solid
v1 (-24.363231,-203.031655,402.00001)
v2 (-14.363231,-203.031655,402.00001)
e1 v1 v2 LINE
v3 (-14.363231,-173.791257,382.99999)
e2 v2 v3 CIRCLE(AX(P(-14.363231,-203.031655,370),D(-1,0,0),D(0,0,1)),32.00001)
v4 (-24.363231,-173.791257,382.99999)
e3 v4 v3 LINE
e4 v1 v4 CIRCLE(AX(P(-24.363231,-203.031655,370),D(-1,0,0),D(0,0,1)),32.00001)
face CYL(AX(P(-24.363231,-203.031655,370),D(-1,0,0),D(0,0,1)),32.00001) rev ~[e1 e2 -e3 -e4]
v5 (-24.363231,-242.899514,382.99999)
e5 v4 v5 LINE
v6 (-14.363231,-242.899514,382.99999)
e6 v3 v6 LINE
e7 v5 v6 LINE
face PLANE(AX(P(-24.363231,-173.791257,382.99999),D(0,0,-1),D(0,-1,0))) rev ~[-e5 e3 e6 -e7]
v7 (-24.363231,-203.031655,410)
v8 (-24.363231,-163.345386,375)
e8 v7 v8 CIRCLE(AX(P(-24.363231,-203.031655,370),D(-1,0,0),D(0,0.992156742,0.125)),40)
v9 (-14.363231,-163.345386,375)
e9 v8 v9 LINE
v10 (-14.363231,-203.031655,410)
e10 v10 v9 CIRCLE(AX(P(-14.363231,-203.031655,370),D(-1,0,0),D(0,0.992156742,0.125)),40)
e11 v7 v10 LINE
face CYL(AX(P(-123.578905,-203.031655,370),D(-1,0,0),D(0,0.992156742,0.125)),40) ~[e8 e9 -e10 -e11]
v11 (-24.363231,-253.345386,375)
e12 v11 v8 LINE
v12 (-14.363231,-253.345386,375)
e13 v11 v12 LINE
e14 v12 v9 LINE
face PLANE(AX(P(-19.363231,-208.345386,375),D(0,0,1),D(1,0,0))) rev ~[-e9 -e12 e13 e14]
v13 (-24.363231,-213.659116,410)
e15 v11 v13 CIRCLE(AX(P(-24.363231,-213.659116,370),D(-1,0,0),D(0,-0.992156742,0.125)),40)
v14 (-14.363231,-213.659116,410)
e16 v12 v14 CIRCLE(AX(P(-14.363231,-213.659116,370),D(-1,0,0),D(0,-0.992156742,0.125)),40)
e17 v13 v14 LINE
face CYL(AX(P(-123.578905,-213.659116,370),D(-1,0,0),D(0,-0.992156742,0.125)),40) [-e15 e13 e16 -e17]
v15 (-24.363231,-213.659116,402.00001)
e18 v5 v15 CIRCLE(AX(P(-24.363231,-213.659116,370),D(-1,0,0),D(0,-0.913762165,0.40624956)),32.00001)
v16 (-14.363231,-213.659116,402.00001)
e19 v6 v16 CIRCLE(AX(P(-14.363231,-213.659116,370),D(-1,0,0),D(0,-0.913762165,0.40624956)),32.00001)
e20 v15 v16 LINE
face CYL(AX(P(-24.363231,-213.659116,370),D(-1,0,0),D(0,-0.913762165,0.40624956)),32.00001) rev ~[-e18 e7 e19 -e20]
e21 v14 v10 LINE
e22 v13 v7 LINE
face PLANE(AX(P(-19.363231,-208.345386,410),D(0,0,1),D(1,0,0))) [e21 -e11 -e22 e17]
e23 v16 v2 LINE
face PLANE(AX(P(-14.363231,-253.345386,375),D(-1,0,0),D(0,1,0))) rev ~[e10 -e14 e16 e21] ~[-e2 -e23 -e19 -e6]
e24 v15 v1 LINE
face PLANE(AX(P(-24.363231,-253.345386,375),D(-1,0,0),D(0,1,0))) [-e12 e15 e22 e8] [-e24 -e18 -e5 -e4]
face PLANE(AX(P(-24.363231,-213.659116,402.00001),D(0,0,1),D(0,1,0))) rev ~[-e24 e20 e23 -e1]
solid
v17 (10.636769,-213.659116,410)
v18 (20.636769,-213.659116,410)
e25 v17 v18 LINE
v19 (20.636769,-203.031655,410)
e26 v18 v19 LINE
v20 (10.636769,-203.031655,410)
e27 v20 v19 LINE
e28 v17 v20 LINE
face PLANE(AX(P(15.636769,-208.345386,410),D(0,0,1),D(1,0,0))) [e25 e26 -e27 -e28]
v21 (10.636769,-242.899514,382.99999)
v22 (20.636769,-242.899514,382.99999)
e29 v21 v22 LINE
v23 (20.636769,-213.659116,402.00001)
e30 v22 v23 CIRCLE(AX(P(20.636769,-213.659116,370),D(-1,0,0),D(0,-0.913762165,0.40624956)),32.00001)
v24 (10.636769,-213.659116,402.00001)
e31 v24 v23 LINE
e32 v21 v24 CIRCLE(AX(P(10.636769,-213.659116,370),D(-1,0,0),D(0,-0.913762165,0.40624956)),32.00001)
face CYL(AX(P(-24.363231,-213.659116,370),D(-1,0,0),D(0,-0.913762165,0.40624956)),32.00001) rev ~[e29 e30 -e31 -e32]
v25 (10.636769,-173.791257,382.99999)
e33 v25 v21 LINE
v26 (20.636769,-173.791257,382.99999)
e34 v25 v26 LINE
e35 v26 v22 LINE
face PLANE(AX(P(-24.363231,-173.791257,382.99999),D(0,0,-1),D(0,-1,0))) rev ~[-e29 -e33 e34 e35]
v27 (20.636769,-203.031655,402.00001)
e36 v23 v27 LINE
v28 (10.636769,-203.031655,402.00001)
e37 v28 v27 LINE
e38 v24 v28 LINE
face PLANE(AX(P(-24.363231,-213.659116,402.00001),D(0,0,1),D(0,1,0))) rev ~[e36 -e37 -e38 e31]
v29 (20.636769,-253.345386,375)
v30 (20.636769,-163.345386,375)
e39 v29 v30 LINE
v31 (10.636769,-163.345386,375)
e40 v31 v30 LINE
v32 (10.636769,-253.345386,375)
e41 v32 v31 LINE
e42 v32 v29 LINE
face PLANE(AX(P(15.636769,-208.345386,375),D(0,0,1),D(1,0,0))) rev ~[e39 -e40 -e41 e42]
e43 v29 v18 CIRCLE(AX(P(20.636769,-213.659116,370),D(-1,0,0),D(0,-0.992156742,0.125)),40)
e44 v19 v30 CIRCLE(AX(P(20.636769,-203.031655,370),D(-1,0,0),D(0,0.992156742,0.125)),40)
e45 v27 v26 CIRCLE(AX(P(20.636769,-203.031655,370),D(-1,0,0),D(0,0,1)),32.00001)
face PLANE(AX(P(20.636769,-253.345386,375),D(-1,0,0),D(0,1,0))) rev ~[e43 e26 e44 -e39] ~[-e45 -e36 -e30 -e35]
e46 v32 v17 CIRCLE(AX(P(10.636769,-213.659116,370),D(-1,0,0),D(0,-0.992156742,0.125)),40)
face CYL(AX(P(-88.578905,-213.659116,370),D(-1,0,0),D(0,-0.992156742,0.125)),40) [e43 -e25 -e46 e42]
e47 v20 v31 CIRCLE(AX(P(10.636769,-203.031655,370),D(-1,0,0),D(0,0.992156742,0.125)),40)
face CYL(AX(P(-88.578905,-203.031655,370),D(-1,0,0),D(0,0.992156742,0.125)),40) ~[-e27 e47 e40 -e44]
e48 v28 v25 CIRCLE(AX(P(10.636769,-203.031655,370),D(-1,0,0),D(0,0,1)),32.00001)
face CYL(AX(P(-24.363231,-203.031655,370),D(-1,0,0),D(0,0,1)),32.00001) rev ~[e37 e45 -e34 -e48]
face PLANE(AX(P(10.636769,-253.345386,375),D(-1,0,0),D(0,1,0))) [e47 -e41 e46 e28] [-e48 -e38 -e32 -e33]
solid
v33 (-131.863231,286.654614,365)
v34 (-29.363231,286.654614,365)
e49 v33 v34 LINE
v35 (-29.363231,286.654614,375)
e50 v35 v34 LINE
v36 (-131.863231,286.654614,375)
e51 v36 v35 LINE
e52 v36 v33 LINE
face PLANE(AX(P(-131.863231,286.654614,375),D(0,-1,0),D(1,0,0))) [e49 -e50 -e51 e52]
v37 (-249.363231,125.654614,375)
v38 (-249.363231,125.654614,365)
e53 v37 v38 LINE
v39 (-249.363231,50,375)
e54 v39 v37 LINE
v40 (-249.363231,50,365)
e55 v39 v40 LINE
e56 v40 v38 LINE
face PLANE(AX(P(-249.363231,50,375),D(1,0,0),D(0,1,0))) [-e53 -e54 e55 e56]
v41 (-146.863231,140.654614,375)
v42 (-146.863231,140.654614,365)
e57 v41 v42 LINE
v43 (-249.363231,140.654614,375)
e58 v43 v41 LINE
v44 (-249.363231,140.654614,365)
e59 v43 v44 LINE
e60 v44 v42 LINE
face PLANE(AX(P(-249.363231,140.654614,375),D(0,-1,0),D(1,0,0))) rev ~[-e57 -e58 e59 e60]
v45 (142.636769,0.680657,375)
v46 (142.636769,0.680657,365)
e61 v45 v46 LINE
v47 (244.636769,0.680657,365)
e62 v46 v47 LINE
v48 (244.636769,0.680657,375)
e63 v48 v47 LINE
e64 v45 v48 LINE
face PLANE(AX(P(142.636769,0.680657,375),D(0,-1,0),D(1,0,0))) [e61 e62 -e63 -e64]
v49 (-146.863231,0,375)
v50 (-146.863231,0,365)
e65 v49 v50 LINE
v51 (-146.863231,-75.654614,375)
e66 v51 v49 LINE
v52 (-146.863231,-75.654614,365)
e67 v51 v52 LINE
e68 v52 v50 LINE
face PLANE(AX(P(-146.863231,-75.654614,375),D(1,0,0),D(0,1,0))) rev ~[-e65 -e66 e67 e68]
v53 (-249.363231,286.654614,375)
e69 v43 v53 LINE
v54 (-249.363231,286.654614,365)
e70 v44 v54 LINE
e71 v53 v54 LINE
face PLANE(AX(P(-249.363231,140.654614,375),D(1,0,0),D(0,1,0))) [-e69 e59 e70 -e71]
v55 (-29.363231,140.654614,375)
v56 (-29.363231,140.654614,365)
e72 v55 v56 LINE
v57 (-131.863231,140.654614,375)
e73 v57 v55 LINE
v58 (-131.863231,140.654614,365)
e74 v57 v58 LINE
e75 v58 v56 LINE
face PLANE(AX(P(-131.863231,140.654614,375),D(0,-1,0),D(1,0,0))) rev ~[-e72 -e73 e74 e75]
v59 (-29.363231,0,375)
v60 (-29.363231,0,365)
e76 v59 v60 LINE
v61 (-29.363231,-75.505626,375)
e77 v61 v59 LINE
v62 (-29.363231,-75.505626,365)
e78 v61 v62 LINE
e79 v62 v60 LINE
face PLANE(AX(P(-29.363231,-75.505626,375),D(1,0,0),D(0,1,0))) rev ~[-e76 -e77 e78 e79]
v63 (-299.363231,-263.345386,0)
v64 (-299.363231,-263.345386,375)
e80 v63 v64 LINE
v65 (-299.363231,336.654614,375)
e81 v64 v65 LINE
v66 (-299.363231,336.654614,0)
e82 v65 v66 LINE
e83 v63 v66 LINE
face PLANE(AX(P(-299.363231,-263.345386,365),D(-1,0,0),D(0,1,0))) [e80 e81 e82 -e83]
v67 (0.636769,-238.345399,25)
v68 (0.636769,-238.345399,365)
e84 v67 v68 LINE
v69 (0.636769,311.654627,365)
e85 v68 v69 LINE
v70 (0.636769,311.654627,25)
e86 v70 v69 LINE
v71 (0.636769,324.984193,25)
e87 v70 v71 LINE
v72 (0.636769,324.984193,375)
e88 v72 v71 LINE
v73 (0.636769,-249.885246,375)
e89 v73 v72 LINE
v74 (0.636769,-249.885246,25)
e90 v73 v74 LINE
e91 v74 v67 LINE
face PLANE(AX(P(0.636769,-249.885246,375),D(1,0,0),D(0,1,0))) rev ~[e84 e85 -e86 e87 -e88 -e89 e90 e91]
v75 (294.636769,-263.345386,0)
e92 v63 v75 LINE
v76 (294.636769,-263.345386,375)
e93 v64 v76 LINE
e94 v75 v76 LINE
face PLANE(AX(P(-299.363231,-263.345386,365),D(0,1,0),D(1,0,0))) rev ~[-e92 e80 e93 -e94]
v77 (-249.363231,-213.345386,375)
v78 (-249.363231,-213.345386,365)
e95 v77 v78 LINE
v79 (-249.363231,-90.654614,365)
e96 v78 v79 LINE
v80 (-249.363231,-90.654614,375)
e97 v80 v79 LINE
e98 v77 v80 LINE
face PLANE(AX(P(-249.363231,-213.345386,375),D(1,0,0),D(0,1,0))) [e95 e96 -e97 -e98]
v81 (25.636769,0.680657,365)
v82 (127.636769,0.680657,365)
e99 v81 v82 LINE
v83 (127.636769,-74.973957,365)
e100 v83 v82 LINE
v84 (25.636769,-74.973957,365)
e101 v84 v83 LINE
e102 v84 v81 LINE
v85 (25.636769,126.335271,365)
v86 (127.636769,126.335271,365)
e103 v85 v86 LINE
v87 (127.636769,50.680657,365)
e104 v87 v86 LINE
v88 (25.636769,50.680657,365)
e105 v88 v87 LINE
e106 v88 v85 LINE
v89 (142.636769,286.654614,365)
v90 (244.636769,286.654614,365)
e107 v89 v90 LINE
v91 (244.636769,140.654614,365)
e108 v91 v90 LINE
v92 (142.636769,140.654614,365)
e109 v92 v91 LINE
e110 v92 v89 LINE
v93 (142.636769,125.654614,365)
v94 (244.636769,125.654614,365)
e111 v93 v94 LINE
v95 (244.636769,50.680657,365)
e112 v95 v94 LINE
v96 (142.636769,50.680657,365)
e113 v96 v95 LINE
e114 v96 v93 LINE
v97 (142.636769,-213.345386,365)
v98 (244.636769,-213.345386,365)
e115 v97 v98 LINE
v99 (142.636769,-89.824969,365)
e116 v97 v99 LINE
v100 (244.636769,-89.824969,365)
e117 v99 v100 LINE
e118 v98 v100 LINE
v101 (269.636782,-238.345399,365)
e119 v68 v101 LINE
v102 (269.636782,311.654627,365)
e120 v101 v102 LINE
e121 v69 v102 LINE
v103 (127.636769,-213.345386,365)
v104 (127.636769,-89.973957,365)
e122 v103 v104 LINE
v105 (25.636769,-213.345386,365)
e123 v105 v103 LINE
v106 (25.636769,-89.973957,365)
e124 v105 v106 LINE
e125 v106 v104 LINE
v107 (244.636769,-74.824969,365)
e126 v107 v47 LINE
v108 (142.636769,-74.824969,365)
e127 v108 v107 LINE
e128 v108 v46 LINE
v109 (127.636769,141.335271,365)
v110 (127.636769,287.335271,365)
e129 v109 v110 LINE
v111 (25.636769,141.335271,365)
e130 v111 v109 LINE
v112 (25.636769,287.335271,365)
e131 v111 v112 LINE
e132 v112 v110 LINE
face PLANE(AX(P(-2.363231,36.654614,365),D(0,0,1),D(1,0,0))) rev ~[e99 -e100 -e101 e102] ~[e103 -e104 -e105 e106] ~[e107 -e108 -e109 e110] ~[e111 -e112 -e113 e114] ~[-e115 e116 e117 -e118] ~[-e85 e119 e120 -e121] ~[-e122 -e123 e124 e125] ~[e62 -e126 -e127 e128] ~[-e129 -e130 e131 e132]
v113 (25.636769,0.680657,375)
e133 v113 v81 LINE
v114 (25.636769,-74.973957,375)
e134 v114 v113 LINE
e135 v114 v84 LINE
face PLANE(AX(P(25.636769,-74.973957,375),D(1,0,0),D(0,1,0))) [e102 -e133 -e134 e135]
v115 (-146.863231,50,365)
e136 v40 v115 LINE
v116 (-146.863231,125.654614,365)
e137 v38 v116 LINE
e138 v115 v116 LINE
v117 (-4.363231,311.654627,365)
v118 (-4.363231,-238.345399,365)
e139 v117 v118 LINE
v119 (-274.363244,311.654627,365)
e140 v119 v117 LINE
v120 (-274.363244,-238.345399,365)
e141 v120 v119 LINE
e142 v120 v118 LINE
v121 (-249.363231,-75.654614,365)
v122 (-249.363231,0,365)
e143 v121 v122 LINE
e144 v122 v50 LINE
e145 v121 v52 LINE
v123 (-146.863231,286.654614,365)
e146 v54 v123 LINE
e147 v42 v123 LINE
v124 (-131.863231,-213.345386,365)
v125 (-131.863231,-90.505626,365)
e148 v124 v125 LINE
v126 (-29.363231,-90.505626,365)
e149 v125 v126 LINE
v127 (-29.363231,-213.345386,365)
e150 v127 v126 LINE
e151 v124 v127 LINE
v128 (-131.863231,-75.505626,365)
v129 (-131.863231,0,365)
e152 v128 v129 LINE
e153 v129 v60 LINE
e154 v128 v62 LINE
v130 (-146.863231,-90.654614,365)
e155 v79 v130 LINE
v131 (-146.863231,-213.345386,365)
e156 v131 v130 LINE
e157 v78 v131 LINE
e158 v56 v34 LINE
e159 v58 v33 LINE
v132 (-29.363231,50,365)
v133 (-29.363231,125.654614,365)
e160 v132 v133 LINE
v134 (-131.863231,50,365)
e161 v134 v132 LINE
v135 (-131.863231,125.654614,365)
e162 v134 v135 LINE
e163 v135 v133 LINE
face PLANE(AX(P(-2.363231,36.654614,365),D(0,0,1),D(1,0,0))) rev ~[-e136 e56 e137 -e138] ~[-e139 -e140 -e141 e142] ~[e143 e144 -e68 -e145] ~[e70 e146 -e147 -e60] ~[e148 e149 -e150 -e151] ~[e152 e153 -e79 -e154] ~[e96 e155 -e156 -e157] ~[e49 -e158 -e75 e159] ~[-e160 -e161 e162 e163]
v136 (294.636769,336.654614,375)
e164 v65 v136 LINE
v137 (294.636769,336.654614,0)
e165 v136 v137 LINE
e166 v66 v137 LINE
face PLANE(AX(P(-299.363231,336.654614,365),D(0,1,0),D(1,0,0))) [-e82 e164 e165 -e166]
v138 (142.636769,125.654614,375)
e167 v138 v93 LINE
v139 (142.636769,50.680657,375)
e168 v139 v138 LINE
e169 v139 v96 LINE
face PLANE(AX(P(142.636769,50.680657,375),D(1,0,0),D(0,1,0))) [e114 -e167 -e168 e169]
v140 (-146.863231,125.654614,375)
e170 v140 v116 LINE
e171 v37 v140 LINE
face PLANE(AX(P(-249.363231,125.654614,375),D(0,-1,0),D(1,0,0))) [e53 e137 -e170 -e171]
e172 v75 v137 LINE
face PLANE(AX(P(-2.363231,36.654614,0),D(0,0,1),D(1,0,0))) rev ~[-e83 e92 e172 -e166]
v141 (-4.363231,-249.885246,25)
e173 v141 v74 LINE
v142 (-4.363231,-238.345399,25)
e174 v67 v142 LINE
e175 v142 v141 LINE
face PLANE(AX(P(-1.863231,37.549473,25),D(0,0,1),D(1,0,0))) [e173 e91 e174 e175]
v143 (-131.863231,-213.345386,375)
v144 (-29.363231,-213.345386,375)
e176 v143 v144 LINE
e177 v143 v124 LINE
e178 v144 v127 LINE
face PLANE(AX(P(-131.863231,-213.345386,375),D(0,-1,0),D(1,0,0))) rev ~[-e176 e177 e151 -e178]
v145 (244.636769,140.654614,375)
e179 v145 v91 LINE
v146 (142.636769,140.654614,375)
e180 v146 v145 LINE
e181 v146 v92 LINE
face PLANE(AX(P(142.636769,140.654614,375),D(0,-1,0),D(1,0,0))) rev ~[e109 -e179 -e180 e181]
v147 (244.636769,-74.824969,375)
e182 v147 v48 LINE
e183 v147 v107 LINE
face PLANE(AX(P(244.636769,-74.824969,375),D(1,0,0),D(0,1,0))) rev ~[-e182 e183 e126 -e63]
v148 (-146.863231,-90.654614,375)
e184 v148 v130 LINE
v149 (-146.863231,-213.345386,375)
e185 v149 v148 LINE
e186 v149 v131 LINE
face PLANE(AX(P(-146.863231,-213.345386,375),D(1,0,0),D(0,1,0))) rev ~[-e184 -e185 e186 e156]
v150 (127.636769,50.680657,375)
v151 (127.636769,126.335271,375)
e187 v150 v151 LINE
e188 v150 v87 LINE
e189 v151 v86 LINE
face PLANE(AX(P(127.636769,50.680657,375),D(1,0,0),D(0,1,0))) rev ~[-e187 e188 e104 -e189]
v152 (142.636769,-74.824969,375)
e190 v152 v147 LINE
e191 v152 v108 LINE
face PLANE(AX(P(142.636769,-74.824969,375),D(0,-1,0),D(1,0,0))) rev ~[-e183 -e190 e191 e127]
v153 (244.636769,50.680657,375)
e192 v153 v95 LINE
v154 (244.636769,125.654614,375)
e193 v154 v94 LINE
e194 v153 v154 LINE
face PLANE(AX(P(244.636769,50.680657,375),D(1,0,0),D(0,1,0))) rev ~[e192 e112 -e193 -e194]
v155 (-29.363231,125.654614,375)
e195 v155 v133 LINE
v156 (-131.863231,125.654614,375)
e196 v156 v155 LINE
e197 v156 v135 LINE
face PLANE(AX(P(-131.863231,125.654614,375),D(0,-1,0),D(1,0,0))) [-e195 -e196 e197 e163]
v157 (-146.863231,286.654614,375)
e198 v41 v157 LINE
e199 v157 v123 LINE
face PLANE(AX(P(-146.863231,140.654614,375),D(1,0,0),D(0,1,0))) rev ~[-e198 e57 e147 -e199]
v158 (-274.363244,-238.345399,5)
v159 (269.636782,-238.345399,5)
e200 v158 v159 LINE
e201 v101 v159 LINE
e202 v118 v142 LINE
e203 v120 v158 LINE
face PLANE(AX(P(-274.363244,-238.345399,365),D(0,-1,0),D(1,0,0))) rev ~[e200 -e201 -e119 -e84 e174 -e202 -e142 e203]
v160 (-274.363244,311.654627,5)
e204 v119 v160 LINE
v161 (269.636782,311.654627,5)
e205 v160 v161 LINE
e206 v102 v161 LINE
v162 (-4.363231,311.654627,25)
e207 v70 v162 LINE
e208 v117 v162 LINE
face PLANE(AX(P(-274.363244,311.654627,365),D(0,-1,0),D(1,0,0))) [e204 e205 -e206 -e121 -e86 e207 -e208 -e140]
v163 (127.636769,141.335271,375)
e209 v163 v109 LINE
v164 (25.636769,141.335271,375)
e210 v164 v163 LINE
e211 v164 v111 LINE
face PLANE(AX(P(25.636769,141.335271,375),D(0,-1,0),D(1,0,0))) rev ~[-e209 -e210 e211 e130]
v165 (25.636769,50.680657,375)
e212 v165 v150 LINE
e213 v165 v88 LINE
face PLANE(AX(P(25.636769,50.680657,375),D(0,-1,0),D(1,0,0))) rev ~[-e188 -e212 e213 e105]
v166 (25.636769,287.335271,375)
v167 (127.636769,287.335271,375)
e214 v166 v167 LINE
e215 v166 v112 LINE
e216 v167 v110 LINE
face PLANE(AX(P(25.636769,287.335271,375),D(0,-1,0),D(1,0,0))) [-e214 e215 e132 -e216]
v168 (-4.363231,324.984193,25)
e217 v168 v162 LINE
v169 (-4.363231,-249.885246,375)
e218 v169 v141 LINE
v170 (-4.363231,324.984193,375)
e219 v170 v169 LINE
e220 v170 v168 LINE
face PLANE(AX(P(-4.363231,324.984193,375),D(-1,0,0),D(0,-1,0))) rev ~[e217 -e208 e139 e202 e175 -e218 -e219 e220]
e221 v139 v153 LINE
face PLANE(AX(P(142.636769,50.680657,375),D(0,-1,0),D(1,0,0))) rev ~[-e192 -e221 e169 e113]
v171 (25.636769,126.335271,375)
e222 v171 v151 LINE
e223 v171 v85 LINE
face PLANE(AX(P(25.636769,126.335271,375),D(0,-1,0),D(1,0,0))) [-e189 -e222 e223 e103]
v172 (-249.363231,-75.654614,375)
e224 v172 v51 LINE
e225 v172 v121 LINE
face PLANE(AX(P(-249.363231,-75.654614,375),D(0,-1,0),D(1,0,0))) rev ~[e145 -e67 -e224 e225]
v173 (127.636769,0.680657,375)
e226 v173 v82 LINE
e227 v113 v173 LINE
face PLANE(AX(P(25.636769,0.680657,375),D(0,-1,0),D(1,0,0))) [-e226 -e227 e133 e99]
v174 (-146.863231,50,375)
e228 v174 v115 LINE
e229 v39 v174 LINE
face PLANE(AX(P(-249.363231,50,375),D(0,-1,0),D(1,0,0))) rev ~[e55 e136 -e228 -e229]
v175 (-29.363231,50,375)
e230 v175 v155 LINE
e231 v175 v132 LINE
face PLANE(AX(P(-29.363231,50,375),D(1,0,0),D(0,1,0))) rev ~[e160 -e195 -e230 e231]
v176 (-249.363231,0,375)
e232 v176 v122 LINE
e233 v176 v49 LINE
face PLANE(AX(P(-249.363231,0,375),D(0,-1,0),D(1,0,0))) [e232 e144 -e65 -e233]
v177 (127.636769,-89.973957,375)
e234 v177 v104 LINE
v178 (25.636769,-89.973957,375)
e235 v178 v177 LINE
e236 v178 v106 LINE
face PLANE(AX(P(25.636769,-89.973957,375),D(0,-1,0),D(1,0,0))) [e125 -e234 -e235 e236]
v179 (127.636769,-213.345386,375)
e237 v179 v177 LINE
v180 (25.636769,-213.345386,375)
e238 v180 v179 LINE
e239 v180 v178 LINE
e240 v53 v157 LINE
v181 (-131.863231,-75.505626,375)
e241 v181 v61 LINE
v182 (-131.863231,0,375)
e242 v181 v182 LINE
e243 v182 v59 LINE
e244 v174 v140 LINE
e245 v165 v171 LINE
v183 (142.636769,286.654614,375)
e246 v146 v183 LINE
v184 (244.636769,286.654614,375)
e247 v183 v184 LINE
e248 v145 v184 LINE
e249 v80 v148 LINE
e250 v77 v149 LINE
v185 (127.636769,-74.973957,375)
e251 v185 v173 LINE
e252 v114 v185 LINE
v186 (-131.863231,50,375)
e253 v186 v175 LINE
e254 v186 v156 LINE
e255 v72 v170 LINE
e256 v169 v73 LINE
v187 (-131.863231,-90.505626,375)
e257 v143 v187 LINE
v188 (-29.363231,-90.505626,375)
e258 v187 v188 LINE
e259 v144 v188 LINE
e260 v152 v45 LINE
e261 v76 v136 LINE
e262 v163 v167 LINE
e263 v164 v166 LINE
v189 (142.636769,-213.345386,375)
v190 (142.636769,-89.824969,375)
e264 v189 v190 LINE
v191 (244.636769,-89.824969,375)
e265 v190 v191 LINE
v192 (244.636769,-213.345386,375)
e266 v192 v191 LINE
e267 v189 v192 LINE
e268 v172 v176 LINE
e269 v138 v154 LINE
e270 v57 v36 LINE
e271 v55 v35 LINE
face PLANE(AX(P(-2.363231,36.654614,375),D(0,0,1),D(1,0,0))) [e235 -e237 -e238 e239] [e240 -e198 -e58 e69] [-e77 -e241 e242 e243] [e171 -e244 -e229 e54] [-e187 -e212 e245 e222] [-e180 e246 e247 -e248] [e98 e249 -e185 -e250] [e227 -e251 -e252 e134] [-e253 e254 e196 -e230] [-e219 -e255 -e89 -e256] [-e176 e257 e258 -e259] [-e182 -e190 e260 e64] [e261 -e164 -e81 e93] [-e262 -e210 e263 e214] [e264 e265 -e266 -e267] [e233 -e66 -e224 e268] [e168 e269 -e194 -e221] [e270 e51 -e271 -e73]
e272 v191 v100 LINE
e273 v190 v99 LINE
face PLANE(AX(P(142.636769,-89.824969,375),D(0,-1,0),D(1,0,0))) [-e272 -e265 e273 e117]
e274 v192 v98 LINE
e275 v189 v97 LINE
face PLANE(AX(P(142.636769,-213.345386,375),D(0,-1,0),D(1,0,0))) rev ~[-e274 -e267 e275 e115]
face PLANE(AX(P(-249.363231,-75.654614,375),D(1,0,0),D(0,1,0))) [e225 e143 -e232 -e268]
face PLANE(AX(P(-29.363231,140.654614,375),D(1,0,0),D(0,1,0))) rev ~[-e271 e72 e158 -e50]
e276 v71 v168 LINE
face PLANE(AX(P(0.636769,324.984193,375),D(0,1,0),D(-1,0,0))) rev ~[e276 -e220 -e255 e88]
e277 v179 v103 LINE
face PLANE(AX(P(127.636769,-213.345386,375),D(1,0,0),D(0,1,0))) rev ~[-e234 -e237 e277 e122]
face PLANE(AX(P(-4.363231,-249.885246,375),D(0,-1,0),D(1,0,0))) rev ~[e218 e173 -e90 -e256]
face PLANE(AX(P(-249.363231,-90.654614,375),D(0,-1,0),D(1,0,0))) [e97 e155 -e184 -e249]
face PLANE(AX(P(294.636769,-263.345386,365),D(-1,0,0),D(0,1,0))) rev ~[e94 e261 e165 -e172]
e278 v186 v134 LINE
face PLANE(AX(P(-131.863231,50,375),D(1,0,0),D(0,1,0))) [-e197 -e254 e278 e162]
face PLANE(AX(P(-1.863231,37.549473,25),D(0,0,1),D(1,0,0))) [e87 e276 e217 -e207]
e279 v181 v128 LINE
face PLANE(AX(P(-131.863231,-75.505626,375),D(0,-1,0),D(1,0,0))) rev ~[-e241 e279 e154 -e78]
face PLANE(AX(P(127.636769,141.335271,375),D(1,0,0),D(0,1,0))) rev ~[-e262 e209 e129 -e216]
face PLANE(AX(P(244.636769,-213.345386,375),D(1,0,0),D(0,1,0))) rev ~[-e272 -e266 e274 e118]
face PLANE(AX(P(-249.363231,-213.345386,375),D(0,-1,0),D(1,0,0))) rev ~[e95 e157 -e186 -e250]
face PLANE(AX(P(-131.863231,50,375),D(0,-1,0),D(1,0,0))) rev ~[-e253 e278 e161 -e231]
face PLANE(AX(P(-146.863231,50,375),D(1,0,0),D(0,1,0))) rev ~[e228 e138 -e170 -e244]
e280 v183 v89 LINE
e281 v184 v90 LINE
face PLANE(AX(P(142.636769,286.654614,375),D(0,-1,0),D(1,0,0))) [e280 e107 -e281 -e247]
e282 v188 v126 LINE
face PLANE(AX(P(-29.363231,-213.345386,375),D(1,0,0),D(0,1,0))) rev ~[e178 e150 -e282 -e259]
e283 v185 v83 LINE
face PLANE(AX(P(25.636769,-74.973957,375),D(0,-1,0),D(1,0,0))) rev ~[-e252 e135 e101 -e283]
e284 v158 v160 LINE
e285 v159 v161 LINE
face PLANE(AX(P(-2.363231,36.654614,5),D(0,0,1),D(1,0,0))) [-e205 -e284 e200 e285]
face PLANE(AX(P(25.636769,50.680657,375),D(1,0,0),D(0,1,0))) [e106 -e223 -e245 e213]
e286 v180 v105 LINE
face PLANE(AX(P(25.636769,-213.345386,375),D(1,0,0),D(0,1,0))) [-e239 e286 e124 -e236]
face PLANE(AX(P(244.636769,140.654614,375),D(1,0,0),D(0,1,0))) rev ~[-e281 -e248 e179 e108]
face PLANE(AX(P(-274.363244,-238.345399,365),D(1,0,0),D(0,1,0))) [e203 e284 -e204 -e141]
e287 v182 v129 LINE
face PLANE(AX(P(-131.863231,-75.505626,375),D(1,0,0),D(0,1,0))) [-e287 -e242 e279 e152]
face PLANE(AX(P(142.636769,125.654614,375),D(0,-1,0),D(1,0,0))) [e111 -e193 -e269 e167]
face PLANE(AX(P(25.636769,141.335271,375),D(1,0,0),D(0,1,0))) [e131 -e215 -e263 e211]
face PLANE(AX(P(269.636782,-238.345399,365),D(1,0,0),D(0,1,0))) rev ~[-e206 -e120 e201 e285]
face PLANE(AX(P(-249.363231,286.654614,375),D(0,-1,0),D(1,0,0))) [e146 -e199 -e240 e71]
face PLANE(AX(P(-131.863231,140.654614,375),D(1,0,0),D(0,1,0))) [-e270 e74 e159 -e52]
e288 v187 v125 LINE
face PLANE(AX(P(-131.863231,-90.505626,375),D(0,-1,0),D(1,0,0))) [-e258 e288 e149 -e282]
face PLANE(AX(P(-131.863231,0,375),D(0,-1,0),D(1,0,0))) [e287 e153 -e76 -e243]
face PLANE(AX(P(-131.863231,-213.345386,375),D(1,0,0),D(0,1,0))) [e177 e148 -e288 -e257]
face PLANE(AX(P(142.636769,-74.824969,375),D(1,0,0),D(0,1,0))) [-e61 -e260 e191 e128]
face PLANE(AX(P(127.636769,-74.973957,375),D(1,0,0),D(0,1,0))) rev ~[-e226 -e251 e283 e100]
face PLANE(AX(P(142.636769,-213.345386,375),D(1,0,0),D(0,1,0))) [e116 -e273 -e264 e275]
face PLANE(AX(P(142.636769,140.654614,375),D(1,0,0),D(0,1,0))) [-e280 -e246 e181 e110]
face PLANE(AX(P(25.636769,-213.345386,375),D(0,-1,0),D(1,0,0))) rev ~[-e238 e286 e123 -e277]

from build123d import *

# Parameters (mm, degrees)
F0_W           = 594
F0_H           = 600
F1_DEPTH       = 365
F2_W           = 544.0000259457
F2_H           = 550.0000259457
F3_DEPTH       = 360
F4_W           = 594
F4_H           = 600
F4_W_2         = 544.0000259457
F4_H_2         = 550.0000259457
F5_DEPTH       = 10
F6_W           = 102.5
F6_H           = 146
F6_H_2         = 75.6546143503
F6_W_2         = 102
F6_H_3         = 74.9739574221
F6_H_4         = 75.5056260526
F6_H_5         = 123.5204165253
F6_H_6         = 123.3714282276
F6_H_7         = 122.8397595971
F6_H_8         = 122.6907712994
F7_DEPTH       = 350
F8_W           = 10
F8_H           = 90
F9_DEPTH       = 35
F10_T1_DEPTH   = 208.4313483298
F10_2_T1_DEPTH = 208.4313483298
F12_DEPTH      = 100


# Not quite as in the source:
# - a fillet or chamfer that OpenCascade refuses, or shapes differently, is made with other operations: its cross-section is extruded or revolved along the edge and cut away or added


with BuildPart() as f1:
    # F0 (on Top) → F1 (new body)
    with BuildSketch(Plane.XY):
        with Locations((-2.3632310331, 36.6546143503)):
            Rectangle(F0_W, F0_H)
    extrude(amount=F1_DEPTH)

    # F2 (on face) → F3 (cut)
    with BuildSketch(Plane.XY.offset(365)):
        with Locations((-2.3632310331, 36.6546143503)):
            Rectangle(F2_W, F2_H)
    extrude(amount=-F3_DEPTH, mode=Mode.SUBTRACT)

    # F4 (on face) → F5 (join)
    with BuildSketch(Plane.XY.offset(365)):
        with Locations((-2.3632310331, 36.6546143503)):
            Rectangle(F4_W, F4_H)
        with Locations((-2.3632310331, 36.6546143503)):
            Rectangle(F4_W_2, F4_H_2, mode=Mode.SUBTRACT)
        with Locations((-2.3632310331, 36.6546143503)):
            Rectangle(F4_W_2, F4_H_2)
    extrude(amount=F5_DEPTH)

    # F6 (on face) → F7 (cut)
    with BuildSketch(Plane.XY.offset(375)):
        with Locations((-198.1132310331, 213.6546143503)):
            Rectangle(F6_W, F6_H)
        with Locations((-80.6132310331, 213.6546143503)):
            Rectangle(F6_W, F6_H)
        with Locations((-80.6132310331, 87.8273071751)):
            Rectangle(F6_W, F6_H_2)
        with Locations((-198.1132310331, 87.8273071751)):
            Rectangle(F6_W, F6_H_2)
        with Locations((76.6367689669, 214.3352712785)):
            Rectangle(F6_W_2, F6_H)
        with Locations((193.6367689669, 213.6546143503)):
            Rectangle(F6_W_2, F6_H)
        with Locations((193.6367689669, 88.1676356392)):
            Rectangle(F6_W_2, F6_H_3)
        with Locations((76.6367689669, 88.5079641033)):
            Rectangle(F6_W_2, F6_H_2)
        with Locations((76.6367689669, -37.146650247)):
            Rectangle(F6_W_2, F6_H_2)
        with Locations((193.6367689669, -37.0721560981)):
            Rectangle(F6_W_2, F6_H_4)
        with Locations((193.6367689669, -151.5851773871)):
            Rectangle(F6_W_2, F6_H_5)
        with Locations((76.6367689669, -151.6596715359)):
            Rectangle(F6_W_2, F6_H_6)
        with Locations((-80.6132310331, -151.9255058512)):
            Rectangle(F6_W, F6_H_7)
        with Locations((-80.6132310331, -37.7528130263)):
            Rectangle(F6_W, F6_H_4)
        with Locations((-198.1132310331, -37.8273071751)):
            Rectangle(F6_W, F6_H_2)
        with Locations((-198.1132310331, -152)):
            Rectangle(F6_W, F6_H_8)
        Polygon((0.6367689669, -249.8852461576), (0.6367689669, 324.9841928482), (-4.3632310331, 324.9841928482), (-4.3632310331, -249.8852461576), (0, -249.8852461576), align=None)
    extrude(amount=-F7_DEPTH, mode=Mode.SUBTRACT)


with BuildPart() as f9:
    # F8 (on face) → F9 (new body)
    with BuildSketch(Plane.XY.offset(375)):
        with Locations((-19.3632310331, -208.3453856497)):
            Rectangle(F8_W, F8_H)
    extrude(amount=F9_DEPTH)

    # F10: fillet of radius 40 on 2 edges, made by hand

    # F10_s2 → F10_t1 (cut)
    with BuildSketch(Plane.YZ.offset(-123.578905198)):
        with BuildLine():
            ThreePointArc((-163.3453856497, 375), (-176.574142205, 400), (-203.0316553157, 410))
            Line((-203.0316553157, 410), (-163.3453856497, 410))
            Line((-163.3453856497, 410), (-163.3453856497, 375))
        make_face()
        with BuildLine():
            ThreePointArc((-253.3453856497, 375), (-240.1166290944, 400), (-213.6591159837, 410))
            Line((-213.6591159837, 410), (-253.3453856497, 410))
            Line((-253.3453856497, 410), (-253.3453856497, 375))
        make_face()
    extrude(amount=F10_T1_DEPTH, mode=Mode.SUBTRACT)


with BuildPart() as f9b:
    # F8 (on face) → F9, piece 2 (new body)
    with BuildSketch(Plane.XY.offset(375)):
        with Locations((15.6367689669, -208.3453856497)):
            Rectangle(F8_W, F8_H)
    extrude(amount=F9_DEPTH)

    # F10#2: fillet of radius 40 on 2 edges, made by hand

    # F10_2_s2 → F10_2_t1 (cut)
    with BuildSketch(Plane.YZ.offset(-88.578905198)):
        with BuildLine():
            ThreePointArc((-163.3453856497, 375), (-176.574142205, 400), (-203.0316553157, 410))
            Line((-203.0316553157, 410), (-163.3453856497, 410))
            Line((-163.3453856497, 410), (-163.3453856497, 375))
        make_face()
        with BuildLine():
            ThreePointArc((-253.3453856497, 375), (-240.1166290944, 400), (-213.6591159837, 410))
            Line((-213.6591159837, 410), (-253.3453856497, 410))
            Line((-253.3453856497, 410), (-253.3453856497, 375))
        make_face()
    extrude(amount=F10_2_T1_DEPTH, mode=Mode.SUBTRACT)


with BuildPart() as f12_tool:
    # F11 (on face) → F12 (new body)
    with BuildSketch(Plane(origin=(-24.3632310331, 0, 0), x_dir=(0, -1, 0), z_dir=(-1, 0, 0))):
        with BuildLine():
            ThreePointArc((242.8995144287, 382.9999899864), (231.094723675, 396.8328199283), (213.6591159837, 402.0000100136))
            Line((213.6591159837, 402.0000100136), (203.0316553157, 402.0000100136))
            ThreePointArc((203.0316553157, 402.0000100136), (185.5960476244, 396.8328199283), (173.7912568707, 382.9999899864))
            Line((173.7912568707, 382.9999899864), (242.8995144287, 382.9999899864))
        make_face()
    extrude(amount=-F12_DEPTH)


with BuildPart() as f9_1:
    add(f9.part)

    # F12: cut by f12_tool
    add(f12_tool.part, mode=Mode.SUBTRACT)


with BuildPart() as f9b_1:
    add(f9b.part)

    # F12: cut by f12_tool
    add(f12_tool.part, mode=Mode.SUBTRACT)


solid = Compound([f1.part, f9_1.part, f9b_1.part])
